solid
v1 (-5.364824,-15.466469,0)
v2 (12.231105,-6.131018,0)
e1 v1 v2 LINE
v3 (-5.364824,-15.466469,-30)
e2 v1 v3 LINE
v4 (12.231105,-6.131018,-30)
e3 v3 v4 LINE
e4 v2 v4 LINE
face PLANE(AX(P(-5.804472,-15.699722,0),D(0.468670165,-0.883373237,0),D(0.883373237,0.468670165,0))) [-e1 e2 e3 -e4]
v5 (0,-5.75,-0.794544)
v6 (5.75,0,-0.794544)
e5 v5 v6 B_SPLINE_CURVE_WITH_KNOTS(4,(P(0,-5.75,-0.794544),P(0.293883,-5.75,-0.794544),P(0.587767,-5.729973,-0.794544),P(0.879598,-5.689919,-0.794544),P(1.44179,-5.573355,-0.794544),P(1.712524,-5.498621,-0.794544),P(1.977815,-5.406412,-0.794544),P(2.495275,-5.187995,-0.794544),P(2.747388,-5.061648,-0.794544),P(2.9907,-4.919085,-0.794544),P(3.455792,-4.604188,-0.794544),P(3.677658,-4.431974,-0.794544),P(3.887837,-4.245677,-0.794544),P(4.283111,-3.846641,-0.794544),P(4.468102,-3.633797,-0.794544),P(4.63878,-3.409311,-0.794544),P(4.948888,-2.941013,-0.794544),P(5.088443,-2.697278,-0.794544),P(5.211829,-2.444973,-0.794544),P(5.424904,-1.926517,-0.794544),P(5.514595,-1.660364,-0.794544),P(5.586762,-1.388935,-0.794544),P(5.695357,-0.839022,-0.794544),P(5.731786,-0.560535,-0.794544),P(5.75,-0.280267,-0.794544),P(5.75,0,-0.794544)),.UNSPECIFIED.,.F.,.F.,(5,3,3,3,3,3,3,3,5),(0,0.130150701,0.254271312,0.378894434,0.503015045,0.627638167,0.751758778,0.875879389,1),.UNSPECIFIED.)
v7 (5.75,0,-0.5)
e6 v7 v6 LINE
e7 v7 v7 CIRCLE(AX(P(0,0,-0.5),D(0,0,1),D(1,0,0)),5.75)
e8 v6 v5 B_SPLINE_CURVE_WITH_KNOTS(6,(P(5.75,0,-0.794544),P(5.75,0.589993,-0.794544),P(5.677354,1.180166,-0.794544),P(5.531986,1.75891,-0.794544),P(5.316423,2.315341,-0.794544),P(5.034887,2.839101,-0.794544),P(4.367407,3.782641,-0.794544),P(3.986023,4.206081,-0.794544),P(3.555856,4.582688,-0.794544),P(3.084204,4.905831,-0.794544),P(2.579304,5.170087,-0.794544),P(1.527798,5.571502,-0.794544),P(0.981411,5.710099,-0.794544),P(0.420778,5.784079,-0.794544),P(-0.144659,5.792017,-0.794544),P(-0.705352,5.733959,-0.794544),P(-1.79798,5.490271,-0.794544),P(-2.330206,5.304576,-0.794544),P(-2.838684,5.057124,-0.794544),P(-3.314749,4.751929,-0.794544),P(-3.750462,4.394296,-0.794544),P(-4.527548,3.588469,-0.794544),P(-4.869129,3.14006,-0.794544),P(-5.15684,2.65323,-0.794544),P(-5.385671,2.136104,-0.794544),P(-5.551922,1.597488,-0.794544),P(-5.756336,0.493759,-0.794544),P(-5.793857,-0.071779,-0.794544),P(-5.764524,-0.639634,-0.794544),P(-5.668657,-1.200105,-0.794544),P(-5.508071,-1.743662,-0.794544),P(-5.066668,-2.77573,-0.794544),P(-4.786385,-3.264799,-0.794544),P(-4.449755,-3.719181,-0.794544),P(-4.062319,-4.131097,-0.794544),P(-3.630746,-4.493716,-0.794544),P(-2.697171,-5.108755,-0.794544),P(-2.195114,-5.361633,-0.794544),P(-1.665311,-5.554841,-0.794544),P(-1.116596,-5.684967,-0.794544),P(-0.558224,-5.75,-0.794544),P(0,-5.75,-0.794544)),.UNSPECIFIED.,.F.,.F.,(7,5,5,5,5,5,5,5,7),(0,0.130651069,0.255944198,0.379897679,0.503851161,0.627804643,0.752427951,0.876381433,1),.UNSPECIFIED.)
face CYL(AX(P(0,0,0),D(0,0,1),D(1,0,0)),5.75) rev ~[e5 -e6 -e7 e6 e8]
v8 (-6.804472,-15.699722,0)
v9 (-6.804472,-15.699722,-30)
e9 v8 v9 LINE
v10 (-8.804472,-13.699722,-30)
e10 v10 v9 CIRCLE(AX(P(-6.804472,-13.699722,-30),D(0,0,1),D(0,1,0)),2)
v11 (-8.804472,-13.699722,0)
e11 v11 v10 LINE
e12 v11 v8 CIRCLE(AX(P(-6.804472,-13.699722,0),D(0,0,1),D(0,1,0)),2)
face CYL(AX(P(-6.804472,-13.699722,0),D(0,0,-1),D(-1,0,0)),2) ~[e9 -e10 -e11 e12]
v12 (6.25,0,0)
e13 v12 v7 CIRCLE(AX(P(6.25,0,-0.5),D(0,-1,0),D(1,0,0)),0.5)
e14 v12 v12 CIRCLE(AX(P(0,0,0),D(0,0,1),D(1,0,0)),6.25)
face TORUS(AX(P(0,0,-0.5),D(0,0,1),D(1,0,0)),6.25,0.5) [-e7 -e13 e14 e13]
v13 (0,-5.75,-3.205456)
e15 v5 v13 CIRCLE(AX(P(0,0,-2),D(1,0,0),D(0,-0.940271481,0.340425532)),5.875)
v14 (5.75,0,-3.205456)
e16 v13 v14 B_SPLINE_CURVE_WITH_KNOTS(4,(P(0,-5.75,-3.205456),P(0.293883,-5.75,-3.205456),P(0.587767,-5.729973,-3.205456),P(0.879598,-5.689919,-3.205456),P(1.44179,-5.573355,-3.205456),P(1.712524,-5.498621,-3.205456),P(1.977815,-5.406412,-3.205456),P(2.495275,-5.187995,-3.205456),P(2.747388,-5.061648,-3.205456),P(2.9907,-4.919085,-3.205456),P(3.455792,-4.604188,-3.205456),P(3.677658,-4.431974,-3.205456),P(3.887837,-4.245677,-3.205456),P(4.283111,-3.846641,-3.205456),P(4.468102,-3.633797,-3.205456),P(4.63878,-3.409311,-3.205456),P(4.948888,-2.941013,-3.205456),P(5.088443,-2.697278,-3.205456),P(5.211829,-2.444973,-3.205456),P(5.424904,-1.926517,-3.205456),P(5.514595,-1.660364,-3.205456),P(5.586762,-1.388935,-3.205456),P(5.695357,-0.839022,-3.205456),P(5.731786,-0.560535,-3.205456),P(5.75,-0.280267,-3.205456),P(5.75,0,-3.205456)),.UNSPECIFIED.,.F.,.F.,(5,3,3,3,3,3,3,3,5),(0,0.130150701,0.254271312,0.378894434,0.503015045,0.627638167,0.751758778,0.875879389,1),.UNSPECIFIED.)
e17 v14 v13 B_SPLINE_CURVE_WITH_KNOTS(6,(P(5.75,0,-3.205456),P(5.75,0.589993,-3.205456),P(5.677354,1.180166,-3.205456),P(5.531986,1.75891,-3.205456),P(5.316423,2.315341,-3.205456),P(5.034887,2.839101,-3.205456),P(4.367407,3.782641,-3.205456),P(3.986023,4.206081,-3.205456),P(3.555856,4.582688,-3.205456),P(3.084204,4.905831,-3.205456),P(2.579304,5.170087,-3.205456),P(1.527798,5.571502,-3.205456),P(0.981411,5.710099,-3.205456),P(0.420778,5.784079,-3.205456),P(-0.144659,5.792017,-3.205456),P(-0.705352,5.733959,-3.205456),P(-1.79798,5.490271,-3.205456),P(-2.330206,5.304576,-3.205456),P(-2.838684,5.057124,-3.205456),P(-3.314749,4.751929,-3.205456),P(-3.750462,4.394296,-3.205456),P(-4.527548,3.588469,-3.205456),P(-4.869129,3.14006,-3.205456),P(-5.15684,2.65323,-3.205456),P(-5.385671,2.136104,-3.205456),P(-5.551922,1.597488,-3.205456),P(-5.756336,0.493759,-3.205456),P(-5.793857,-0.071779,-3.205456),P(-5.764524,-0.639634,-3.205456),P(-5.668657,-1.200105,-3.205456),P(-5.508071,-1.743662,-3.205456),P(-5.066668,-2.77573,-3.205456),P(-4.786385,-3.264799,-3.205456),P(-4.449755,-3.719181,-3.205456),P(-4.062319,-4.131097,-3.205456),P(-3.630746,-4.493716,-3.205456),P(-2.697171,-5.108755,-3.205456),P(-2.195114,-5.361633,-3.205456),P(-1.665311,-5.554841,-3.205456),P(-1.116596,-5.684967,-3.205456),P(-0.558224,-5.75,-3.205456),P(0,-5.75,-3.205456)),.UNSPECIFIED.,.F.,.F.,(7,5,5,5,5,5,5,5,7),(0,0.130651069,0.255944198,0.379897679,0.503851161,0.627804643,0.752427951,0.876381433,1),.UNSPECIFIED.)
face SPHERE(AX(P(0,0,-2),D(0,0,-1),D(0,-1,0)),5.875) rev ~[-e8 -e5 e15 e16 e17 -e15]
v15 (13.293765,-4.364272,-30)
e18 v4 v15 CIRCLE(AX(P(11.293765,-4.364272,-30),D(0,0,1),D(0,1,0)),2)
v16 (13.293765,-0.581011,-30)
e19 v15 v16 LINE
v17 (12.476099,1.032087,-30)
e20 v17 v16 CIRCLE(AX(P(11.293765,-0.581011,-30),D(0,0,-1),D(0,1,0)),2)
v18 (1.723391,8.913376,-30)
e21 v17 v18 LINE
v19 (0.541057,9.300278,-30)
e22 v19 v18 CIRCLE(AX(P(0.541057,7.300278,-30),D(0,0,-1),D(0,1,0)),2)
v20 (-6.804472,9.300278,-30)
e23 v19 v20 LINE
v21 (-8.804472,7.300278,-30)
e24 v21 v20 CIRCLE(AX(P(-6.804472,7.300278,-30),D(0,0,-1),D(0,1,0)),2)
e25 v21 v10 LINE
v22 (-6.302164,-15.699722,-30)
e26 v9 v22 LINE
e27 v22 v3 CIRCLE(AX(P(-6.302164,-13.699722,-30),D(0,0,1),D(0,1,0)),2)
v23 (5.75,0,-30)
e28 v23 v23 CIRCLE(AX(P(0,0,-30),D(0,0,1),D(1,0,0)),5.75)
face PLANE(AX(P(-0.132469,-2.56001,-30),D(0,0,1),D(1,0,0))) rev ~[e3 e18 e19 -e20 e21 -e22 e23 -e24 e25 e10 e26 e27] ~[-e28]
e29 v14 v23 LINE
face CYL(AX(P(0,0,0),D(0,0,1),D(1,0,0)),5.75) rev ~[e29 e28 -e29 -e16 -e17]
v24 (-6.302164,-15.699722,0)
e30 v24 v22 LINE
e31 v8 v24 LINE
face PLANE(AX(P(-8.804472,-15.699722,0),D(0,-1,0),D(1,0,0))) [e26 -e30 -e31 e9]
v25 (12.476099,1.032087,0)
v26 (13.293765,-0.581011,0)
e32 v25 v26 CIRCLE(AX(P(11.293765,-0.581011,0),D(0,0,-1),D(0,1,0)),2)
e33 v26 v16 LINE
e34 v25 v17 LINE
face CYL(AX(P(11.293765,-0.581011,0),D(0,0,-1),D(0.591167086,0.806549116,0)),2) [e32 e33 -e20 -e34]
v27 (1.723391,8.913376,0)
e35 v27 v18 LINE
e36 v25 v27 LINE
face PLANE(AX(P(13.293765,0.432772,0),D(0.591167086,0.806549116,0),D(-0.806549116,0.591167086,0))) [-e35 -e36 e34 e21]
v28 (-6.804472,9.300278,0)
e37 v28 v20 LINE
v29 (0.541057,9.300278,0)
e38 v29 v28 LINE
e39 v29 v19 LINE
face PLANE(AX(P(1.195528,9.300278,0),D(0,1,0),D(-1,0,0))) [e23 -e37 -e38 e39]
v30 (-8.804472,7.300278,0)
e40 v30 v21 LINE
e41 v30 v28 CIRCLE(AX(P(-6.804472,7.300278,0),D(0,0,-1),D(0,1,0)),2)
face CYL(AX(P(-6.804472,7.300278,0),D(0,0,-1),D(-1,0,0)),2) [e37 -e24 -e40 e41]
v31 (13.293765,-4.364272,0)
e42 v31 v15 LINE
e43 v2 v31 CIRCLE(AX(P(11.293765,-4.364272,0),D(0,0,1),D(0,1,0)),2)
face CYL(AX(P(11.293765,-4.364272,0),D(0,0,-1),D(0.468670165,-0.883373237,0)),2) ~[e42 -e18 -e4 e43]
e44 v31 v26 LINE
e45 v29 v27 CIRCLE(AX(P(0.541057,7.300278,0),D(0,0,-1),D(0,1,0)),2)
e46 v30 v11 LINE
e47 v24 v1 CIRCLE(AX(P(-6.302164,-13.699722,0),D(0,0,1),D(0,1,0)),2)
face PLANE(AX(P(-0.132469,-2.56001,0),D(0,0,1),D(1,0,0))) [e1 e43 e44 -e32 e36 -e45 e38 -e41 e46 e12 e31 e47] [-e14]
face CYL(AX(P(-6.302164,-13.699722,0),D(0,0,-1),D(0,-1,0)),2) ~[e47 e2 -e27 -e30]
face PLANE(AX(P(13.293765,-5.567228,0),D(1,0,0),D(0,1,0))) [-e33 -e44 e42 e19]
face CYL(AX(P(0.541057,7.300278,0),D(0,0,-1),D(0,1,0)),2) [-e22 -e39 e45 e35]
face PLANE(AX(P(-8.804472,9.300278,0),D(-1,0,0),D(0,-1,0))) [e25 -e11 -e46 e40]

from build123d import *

# Parameters (mm, degrees)
F0_R     = 5.75
F1_DEPTH = 30
F2_R     = 2
F5_R     = 0.5


with BuildPart() as f1:
    # F0 (on Top) → F1 (new body)
    with BuildSketch(Plane.XY):
        Polygon((-8.8044720603, 9.3002779725), (-8.8044720603, -15.6997220275), (-5.8044720603, -15.6997220275), (13.2937646807, -5.5672283149), (13.2937646807, 0.4327716851), (1.1955279397, 9.3002779725), align=None)
        Circle(F0_R, mode=Mode.SUBTRACT)
    extrude(amount=-F1_DEPTH)

    # F2
    f2_edges = [f1.edges().sort_by_distance(p)[0] for p in [
        (-8.804472, 9.300278, -15),
        (1.195528, 9.300278, -15),
        (-8.804472, -15.699722, -15),
        (13.293765, -5.567228, -15),
        (-5.804472, -15.699722, -15),
        (13.293765, 0.432772, -15),
    ]]
    fillet(f2_edges, radius=F2_R)

    # F3 (on Right) → F4 (revolve, cut)
    with BuildSketch(Plane.YZ):
        with BuildLine():
            Line((0, 0), (-5.5240949485, 0))
            ThreePointArc((-5.5240949485, 0), (-4.8096582519, -5.3738423941), (0, -7.875))
            Line((0, -7.875), (0, 0))
        make_face()
    revolve(axis=Axis((0, 0, -1), (0, 0, -1)), mode=Mode.SUBTRACT)

    # F5
    f5_edges = [f1.edges().sort_by_distance(p)[0] for p in [
        (-5.75, 0, 0),
    ]]
    fillet(f5_edges, radius=F5_R)


solid = f1.part
